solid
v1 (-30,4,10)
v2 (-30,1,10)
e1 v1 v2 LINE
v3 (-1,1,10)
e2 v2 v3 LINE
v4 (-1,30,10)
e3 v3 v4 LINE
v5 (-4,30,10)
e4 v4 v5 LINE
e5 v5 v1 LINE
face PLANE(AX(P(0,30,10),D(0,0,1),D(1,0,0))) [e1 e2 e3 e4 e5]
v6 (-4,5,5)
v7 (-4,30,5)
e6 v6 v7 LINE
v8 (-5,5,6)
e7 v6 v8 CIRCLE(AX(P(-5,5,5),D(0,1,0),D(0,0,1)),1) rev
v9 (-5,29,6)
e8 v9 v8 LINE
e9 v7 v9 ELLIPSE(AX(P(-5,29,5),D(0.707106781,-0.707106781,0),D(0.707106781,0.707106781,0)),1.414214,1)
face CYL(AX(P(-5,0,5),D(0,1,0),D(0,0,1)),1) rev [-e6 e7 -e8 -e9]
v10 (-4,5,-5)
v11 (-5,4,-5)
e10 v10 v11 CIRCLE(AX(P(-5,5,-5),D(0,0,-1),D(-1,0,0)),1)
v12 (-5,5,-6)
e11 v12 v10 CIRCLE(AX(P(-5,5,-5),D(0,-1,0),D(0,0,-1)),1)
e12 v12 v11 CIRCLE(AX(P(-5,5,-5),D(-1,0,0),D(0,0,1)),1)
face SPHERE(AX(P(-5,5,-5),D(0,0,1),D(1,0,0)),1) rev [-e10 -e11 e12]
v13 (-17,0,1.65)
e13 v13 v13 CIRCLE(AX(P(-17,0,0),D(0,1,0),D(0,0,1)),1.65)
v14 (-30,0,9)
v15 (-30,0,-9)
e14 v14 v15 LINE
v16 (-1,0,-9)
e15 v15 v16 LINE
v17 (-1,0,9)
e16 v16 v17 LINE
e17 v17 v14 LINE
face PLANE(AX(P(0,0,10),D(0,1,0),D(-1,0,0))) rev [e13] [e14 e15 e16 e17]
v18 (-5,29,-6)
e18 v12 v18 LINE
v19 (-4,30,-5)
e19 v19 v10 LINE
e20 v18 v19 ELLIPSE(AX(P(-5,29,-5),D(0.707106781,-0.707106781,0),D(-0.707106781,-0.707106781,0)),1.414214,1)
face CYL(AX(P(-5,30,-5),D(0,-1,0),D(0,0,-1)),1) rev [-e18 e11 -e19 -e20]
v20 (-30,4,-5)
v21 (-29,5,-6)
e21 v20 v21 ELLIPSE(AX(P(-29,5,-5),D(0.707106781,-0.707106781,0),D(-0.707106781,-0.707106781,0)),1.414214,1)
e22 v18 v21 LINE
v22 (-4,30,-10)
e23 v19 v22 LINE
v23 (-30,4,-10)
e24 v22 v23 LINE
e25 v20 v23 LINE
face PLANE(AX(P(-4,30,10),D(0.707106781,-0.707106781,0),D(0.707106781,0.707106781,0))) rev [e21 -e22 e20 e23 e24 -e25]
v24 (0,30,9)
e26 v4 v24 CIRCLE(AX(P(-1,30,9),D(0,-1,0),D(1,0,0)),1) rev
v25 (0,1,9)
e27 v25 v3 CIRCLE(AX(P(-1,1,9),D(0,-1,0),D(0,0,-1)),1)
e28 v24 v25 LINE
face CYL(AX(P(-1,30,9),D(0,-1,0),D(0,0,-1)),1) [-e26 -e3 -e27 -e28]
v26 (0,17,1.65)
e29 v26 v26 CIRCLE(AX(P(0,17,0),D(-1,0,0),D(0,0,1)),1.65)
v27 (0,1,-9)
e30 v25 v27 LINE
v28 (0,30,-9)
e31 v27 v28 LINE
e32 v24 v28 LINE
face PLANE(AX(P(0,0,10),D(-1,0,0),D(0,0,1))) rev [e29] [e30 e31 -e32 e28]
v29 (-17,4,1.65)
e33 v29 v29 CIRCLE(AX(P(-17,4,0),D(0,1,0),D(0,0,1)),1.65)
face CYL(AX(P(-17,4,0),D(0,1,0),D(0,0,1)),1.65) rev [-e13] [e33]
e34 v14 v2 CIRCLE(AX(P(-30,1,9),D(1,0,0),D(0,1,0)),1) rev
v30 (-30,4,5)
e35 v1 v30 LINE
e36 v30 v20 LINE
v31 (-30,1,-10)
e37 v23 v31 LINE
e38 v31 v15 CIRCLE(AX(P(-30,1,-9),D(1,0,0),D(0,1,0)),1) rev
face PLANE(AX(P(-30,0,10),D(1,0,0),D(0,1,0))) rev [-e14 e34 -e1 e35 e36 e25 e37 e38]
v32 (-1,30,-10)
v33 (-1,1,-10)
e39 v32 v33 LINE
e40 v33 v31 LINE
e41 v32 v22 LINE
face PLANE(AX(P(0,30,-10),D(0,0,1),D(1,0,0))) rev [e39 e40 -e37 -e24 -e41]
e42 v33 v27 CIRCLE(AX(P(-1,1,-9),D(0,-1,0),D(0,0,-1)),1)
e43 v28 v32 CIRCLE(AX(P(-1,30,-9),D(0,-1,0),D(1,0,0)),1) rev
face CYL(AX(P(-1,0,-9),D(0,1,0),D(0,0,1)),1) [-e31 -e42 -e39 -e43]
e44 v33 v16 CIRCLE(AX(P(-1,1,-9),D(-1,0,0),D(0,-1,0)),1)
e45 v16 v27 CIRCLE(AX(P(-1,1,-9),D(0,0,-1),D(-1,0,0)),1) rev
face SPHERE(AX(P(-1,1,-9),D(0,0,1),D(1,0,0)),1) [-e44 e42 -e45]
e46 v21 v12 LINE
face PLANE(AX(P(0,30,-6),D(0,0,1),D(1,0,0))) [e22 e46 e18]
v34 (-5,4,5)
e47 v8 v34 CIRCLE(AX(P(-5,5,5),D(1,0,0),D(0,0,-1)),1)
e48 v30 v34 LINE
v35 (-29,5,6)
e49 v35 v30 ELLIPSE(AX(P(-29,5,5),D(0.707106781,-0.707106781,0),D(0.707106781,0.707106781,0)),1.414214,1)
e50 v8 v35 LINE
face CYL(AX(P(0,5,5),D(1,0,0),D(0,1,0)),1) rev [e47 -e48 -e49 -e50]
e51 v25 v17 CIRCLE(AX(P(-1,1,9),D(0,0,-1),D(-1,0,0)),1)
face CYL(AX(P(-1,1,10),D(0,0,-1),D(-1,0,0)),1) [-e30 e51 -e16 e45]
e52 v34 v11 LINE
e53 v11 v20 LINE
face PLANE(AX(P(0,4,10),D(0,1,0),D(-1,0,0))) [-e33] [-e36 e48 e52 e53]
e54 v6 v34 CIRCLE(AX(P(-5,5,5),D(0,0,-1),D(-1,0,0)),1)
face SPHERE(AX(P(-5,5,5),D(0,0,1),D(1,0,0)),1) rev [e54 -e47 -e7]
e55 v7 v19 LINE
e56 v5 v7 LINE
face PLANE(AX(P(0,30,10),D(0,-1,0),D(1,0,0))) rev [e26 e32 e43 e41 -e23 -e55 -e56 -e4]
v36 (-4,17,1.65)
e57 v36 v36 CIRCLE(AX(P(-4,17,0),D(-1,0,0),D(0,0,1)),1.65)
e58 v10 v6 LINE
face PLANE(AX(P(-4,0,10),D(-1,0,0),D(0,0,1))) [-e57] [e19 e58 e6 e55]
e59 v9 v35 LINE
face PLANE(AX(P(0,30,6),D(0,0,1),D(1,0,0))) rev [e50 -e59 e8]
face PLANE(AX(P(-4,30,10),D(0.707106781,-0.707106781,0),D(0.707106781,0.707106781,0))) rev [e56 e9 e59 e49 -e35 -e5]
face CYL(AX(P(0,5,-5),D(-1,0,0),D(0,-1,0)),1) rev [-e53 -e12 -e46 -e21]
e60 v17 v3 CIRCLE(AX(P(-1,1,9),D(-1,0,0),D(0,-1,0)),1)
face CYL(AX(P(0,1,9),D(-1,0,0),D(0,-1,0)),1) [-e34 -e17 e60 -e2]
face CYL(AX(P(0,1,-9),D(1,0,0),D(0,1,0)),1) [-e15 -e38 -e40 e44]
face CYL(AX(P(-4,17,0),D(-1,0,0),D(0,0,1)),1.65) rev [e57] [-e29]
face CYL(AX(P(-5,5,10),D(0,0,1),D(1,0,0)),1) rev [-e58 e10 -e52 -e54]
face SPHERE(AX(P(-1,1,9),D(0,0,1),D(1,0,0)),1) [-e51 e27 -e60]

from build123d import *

# Parameters (mm, degrees)
EXTRUDE_3_DEPTH    = 10
SHELL_START        = -30
SHELL_1_OUTLINE_W  = 27
SHELL_1_OUTLINE_H  = 12
SHELL_1_DEPTH      = 26
HOLE_WIZARD_M4_2_D = 3.3
HOLE_WIZARD_M4_3_D = 3.3
FILLET_2_R         = 1
FILLET_3_R         = 1


# Read off the part's stored shape, not the designer's step: 薄殼1
with BuildPart() as part:
    # 草圖8 → 填料-伸長3 (new, symmetric)
    with BuildSketch(Plane.XY):
        Polygon((-4, 30), (-30, 4), (-30, 0), (0, 0), (0, 30), align=None)
    extrude(amount=EXTRUDE_3_DEPTH, both=True)

    # 薄殼1 outline → 薄殼1 (cut)
    with BuildSketch(Plane.YZ.offset(SHELL_START)):
        with Locations((17.5, 0)):
            Rectangle(SHELL_1_OUTLINE_W, SHELL_1_OUTLINE_H)
    extrude(amount=SHELL_1_DEPTH, mode=Mode.SUBTRACT)

    # M4 螺紋孔2 (through all)
    with Locations(Plane(origin=(0, 4, 0), x_dir=(-1, 0, 0), z_dir=(0, 1, 0))):
        with Locations((17, 0)):
            Hole(HOLE_WIZARD_M4_2_D / 2)

    # M4 螺紋孔3 (through all)
    with Locations(Plane(origin=(-4, 0, 0), x_dir=(0, -1, 0), z_dir=(-1, 0, 0))):
        with Locations((-17, 0)):
            Hole(HOLE_WIZARD_M4_3_D / 2)

    # 圓角2
    fillet_2_edges = [part.edges().sort_by_distance(p)[0] for p in [
        (-4, 17, -6),
        (-4, 17, 6),
        (0, 0, 0),
    ]]
    fillet(fillet_2_edges, radius=FILLET_2_R)

    # 圓角3
    fillet_3_edges = [part.edges().sort_by_distance(p)[0] for p in [
        (-15.5, 0, 10),
        (-17.5, 4, -6),
        (-17.5, 4, 6),
        (-4, 4, 0),
        (-4.292893219, 4, -5.707106781),
        (-4.292893219, 4, 5.707106781),
        (0, 15.5, -10),
        (0, 15.5, 10),
        (-0.292893219, 0.292893219, -10),
        (-0.292893219, 0.292893219, 10),
        (-15.5, 0, -10),
    ]]
    fillet(fillet_3_edges, radius=FILLET_3_R)


solid = part.part
